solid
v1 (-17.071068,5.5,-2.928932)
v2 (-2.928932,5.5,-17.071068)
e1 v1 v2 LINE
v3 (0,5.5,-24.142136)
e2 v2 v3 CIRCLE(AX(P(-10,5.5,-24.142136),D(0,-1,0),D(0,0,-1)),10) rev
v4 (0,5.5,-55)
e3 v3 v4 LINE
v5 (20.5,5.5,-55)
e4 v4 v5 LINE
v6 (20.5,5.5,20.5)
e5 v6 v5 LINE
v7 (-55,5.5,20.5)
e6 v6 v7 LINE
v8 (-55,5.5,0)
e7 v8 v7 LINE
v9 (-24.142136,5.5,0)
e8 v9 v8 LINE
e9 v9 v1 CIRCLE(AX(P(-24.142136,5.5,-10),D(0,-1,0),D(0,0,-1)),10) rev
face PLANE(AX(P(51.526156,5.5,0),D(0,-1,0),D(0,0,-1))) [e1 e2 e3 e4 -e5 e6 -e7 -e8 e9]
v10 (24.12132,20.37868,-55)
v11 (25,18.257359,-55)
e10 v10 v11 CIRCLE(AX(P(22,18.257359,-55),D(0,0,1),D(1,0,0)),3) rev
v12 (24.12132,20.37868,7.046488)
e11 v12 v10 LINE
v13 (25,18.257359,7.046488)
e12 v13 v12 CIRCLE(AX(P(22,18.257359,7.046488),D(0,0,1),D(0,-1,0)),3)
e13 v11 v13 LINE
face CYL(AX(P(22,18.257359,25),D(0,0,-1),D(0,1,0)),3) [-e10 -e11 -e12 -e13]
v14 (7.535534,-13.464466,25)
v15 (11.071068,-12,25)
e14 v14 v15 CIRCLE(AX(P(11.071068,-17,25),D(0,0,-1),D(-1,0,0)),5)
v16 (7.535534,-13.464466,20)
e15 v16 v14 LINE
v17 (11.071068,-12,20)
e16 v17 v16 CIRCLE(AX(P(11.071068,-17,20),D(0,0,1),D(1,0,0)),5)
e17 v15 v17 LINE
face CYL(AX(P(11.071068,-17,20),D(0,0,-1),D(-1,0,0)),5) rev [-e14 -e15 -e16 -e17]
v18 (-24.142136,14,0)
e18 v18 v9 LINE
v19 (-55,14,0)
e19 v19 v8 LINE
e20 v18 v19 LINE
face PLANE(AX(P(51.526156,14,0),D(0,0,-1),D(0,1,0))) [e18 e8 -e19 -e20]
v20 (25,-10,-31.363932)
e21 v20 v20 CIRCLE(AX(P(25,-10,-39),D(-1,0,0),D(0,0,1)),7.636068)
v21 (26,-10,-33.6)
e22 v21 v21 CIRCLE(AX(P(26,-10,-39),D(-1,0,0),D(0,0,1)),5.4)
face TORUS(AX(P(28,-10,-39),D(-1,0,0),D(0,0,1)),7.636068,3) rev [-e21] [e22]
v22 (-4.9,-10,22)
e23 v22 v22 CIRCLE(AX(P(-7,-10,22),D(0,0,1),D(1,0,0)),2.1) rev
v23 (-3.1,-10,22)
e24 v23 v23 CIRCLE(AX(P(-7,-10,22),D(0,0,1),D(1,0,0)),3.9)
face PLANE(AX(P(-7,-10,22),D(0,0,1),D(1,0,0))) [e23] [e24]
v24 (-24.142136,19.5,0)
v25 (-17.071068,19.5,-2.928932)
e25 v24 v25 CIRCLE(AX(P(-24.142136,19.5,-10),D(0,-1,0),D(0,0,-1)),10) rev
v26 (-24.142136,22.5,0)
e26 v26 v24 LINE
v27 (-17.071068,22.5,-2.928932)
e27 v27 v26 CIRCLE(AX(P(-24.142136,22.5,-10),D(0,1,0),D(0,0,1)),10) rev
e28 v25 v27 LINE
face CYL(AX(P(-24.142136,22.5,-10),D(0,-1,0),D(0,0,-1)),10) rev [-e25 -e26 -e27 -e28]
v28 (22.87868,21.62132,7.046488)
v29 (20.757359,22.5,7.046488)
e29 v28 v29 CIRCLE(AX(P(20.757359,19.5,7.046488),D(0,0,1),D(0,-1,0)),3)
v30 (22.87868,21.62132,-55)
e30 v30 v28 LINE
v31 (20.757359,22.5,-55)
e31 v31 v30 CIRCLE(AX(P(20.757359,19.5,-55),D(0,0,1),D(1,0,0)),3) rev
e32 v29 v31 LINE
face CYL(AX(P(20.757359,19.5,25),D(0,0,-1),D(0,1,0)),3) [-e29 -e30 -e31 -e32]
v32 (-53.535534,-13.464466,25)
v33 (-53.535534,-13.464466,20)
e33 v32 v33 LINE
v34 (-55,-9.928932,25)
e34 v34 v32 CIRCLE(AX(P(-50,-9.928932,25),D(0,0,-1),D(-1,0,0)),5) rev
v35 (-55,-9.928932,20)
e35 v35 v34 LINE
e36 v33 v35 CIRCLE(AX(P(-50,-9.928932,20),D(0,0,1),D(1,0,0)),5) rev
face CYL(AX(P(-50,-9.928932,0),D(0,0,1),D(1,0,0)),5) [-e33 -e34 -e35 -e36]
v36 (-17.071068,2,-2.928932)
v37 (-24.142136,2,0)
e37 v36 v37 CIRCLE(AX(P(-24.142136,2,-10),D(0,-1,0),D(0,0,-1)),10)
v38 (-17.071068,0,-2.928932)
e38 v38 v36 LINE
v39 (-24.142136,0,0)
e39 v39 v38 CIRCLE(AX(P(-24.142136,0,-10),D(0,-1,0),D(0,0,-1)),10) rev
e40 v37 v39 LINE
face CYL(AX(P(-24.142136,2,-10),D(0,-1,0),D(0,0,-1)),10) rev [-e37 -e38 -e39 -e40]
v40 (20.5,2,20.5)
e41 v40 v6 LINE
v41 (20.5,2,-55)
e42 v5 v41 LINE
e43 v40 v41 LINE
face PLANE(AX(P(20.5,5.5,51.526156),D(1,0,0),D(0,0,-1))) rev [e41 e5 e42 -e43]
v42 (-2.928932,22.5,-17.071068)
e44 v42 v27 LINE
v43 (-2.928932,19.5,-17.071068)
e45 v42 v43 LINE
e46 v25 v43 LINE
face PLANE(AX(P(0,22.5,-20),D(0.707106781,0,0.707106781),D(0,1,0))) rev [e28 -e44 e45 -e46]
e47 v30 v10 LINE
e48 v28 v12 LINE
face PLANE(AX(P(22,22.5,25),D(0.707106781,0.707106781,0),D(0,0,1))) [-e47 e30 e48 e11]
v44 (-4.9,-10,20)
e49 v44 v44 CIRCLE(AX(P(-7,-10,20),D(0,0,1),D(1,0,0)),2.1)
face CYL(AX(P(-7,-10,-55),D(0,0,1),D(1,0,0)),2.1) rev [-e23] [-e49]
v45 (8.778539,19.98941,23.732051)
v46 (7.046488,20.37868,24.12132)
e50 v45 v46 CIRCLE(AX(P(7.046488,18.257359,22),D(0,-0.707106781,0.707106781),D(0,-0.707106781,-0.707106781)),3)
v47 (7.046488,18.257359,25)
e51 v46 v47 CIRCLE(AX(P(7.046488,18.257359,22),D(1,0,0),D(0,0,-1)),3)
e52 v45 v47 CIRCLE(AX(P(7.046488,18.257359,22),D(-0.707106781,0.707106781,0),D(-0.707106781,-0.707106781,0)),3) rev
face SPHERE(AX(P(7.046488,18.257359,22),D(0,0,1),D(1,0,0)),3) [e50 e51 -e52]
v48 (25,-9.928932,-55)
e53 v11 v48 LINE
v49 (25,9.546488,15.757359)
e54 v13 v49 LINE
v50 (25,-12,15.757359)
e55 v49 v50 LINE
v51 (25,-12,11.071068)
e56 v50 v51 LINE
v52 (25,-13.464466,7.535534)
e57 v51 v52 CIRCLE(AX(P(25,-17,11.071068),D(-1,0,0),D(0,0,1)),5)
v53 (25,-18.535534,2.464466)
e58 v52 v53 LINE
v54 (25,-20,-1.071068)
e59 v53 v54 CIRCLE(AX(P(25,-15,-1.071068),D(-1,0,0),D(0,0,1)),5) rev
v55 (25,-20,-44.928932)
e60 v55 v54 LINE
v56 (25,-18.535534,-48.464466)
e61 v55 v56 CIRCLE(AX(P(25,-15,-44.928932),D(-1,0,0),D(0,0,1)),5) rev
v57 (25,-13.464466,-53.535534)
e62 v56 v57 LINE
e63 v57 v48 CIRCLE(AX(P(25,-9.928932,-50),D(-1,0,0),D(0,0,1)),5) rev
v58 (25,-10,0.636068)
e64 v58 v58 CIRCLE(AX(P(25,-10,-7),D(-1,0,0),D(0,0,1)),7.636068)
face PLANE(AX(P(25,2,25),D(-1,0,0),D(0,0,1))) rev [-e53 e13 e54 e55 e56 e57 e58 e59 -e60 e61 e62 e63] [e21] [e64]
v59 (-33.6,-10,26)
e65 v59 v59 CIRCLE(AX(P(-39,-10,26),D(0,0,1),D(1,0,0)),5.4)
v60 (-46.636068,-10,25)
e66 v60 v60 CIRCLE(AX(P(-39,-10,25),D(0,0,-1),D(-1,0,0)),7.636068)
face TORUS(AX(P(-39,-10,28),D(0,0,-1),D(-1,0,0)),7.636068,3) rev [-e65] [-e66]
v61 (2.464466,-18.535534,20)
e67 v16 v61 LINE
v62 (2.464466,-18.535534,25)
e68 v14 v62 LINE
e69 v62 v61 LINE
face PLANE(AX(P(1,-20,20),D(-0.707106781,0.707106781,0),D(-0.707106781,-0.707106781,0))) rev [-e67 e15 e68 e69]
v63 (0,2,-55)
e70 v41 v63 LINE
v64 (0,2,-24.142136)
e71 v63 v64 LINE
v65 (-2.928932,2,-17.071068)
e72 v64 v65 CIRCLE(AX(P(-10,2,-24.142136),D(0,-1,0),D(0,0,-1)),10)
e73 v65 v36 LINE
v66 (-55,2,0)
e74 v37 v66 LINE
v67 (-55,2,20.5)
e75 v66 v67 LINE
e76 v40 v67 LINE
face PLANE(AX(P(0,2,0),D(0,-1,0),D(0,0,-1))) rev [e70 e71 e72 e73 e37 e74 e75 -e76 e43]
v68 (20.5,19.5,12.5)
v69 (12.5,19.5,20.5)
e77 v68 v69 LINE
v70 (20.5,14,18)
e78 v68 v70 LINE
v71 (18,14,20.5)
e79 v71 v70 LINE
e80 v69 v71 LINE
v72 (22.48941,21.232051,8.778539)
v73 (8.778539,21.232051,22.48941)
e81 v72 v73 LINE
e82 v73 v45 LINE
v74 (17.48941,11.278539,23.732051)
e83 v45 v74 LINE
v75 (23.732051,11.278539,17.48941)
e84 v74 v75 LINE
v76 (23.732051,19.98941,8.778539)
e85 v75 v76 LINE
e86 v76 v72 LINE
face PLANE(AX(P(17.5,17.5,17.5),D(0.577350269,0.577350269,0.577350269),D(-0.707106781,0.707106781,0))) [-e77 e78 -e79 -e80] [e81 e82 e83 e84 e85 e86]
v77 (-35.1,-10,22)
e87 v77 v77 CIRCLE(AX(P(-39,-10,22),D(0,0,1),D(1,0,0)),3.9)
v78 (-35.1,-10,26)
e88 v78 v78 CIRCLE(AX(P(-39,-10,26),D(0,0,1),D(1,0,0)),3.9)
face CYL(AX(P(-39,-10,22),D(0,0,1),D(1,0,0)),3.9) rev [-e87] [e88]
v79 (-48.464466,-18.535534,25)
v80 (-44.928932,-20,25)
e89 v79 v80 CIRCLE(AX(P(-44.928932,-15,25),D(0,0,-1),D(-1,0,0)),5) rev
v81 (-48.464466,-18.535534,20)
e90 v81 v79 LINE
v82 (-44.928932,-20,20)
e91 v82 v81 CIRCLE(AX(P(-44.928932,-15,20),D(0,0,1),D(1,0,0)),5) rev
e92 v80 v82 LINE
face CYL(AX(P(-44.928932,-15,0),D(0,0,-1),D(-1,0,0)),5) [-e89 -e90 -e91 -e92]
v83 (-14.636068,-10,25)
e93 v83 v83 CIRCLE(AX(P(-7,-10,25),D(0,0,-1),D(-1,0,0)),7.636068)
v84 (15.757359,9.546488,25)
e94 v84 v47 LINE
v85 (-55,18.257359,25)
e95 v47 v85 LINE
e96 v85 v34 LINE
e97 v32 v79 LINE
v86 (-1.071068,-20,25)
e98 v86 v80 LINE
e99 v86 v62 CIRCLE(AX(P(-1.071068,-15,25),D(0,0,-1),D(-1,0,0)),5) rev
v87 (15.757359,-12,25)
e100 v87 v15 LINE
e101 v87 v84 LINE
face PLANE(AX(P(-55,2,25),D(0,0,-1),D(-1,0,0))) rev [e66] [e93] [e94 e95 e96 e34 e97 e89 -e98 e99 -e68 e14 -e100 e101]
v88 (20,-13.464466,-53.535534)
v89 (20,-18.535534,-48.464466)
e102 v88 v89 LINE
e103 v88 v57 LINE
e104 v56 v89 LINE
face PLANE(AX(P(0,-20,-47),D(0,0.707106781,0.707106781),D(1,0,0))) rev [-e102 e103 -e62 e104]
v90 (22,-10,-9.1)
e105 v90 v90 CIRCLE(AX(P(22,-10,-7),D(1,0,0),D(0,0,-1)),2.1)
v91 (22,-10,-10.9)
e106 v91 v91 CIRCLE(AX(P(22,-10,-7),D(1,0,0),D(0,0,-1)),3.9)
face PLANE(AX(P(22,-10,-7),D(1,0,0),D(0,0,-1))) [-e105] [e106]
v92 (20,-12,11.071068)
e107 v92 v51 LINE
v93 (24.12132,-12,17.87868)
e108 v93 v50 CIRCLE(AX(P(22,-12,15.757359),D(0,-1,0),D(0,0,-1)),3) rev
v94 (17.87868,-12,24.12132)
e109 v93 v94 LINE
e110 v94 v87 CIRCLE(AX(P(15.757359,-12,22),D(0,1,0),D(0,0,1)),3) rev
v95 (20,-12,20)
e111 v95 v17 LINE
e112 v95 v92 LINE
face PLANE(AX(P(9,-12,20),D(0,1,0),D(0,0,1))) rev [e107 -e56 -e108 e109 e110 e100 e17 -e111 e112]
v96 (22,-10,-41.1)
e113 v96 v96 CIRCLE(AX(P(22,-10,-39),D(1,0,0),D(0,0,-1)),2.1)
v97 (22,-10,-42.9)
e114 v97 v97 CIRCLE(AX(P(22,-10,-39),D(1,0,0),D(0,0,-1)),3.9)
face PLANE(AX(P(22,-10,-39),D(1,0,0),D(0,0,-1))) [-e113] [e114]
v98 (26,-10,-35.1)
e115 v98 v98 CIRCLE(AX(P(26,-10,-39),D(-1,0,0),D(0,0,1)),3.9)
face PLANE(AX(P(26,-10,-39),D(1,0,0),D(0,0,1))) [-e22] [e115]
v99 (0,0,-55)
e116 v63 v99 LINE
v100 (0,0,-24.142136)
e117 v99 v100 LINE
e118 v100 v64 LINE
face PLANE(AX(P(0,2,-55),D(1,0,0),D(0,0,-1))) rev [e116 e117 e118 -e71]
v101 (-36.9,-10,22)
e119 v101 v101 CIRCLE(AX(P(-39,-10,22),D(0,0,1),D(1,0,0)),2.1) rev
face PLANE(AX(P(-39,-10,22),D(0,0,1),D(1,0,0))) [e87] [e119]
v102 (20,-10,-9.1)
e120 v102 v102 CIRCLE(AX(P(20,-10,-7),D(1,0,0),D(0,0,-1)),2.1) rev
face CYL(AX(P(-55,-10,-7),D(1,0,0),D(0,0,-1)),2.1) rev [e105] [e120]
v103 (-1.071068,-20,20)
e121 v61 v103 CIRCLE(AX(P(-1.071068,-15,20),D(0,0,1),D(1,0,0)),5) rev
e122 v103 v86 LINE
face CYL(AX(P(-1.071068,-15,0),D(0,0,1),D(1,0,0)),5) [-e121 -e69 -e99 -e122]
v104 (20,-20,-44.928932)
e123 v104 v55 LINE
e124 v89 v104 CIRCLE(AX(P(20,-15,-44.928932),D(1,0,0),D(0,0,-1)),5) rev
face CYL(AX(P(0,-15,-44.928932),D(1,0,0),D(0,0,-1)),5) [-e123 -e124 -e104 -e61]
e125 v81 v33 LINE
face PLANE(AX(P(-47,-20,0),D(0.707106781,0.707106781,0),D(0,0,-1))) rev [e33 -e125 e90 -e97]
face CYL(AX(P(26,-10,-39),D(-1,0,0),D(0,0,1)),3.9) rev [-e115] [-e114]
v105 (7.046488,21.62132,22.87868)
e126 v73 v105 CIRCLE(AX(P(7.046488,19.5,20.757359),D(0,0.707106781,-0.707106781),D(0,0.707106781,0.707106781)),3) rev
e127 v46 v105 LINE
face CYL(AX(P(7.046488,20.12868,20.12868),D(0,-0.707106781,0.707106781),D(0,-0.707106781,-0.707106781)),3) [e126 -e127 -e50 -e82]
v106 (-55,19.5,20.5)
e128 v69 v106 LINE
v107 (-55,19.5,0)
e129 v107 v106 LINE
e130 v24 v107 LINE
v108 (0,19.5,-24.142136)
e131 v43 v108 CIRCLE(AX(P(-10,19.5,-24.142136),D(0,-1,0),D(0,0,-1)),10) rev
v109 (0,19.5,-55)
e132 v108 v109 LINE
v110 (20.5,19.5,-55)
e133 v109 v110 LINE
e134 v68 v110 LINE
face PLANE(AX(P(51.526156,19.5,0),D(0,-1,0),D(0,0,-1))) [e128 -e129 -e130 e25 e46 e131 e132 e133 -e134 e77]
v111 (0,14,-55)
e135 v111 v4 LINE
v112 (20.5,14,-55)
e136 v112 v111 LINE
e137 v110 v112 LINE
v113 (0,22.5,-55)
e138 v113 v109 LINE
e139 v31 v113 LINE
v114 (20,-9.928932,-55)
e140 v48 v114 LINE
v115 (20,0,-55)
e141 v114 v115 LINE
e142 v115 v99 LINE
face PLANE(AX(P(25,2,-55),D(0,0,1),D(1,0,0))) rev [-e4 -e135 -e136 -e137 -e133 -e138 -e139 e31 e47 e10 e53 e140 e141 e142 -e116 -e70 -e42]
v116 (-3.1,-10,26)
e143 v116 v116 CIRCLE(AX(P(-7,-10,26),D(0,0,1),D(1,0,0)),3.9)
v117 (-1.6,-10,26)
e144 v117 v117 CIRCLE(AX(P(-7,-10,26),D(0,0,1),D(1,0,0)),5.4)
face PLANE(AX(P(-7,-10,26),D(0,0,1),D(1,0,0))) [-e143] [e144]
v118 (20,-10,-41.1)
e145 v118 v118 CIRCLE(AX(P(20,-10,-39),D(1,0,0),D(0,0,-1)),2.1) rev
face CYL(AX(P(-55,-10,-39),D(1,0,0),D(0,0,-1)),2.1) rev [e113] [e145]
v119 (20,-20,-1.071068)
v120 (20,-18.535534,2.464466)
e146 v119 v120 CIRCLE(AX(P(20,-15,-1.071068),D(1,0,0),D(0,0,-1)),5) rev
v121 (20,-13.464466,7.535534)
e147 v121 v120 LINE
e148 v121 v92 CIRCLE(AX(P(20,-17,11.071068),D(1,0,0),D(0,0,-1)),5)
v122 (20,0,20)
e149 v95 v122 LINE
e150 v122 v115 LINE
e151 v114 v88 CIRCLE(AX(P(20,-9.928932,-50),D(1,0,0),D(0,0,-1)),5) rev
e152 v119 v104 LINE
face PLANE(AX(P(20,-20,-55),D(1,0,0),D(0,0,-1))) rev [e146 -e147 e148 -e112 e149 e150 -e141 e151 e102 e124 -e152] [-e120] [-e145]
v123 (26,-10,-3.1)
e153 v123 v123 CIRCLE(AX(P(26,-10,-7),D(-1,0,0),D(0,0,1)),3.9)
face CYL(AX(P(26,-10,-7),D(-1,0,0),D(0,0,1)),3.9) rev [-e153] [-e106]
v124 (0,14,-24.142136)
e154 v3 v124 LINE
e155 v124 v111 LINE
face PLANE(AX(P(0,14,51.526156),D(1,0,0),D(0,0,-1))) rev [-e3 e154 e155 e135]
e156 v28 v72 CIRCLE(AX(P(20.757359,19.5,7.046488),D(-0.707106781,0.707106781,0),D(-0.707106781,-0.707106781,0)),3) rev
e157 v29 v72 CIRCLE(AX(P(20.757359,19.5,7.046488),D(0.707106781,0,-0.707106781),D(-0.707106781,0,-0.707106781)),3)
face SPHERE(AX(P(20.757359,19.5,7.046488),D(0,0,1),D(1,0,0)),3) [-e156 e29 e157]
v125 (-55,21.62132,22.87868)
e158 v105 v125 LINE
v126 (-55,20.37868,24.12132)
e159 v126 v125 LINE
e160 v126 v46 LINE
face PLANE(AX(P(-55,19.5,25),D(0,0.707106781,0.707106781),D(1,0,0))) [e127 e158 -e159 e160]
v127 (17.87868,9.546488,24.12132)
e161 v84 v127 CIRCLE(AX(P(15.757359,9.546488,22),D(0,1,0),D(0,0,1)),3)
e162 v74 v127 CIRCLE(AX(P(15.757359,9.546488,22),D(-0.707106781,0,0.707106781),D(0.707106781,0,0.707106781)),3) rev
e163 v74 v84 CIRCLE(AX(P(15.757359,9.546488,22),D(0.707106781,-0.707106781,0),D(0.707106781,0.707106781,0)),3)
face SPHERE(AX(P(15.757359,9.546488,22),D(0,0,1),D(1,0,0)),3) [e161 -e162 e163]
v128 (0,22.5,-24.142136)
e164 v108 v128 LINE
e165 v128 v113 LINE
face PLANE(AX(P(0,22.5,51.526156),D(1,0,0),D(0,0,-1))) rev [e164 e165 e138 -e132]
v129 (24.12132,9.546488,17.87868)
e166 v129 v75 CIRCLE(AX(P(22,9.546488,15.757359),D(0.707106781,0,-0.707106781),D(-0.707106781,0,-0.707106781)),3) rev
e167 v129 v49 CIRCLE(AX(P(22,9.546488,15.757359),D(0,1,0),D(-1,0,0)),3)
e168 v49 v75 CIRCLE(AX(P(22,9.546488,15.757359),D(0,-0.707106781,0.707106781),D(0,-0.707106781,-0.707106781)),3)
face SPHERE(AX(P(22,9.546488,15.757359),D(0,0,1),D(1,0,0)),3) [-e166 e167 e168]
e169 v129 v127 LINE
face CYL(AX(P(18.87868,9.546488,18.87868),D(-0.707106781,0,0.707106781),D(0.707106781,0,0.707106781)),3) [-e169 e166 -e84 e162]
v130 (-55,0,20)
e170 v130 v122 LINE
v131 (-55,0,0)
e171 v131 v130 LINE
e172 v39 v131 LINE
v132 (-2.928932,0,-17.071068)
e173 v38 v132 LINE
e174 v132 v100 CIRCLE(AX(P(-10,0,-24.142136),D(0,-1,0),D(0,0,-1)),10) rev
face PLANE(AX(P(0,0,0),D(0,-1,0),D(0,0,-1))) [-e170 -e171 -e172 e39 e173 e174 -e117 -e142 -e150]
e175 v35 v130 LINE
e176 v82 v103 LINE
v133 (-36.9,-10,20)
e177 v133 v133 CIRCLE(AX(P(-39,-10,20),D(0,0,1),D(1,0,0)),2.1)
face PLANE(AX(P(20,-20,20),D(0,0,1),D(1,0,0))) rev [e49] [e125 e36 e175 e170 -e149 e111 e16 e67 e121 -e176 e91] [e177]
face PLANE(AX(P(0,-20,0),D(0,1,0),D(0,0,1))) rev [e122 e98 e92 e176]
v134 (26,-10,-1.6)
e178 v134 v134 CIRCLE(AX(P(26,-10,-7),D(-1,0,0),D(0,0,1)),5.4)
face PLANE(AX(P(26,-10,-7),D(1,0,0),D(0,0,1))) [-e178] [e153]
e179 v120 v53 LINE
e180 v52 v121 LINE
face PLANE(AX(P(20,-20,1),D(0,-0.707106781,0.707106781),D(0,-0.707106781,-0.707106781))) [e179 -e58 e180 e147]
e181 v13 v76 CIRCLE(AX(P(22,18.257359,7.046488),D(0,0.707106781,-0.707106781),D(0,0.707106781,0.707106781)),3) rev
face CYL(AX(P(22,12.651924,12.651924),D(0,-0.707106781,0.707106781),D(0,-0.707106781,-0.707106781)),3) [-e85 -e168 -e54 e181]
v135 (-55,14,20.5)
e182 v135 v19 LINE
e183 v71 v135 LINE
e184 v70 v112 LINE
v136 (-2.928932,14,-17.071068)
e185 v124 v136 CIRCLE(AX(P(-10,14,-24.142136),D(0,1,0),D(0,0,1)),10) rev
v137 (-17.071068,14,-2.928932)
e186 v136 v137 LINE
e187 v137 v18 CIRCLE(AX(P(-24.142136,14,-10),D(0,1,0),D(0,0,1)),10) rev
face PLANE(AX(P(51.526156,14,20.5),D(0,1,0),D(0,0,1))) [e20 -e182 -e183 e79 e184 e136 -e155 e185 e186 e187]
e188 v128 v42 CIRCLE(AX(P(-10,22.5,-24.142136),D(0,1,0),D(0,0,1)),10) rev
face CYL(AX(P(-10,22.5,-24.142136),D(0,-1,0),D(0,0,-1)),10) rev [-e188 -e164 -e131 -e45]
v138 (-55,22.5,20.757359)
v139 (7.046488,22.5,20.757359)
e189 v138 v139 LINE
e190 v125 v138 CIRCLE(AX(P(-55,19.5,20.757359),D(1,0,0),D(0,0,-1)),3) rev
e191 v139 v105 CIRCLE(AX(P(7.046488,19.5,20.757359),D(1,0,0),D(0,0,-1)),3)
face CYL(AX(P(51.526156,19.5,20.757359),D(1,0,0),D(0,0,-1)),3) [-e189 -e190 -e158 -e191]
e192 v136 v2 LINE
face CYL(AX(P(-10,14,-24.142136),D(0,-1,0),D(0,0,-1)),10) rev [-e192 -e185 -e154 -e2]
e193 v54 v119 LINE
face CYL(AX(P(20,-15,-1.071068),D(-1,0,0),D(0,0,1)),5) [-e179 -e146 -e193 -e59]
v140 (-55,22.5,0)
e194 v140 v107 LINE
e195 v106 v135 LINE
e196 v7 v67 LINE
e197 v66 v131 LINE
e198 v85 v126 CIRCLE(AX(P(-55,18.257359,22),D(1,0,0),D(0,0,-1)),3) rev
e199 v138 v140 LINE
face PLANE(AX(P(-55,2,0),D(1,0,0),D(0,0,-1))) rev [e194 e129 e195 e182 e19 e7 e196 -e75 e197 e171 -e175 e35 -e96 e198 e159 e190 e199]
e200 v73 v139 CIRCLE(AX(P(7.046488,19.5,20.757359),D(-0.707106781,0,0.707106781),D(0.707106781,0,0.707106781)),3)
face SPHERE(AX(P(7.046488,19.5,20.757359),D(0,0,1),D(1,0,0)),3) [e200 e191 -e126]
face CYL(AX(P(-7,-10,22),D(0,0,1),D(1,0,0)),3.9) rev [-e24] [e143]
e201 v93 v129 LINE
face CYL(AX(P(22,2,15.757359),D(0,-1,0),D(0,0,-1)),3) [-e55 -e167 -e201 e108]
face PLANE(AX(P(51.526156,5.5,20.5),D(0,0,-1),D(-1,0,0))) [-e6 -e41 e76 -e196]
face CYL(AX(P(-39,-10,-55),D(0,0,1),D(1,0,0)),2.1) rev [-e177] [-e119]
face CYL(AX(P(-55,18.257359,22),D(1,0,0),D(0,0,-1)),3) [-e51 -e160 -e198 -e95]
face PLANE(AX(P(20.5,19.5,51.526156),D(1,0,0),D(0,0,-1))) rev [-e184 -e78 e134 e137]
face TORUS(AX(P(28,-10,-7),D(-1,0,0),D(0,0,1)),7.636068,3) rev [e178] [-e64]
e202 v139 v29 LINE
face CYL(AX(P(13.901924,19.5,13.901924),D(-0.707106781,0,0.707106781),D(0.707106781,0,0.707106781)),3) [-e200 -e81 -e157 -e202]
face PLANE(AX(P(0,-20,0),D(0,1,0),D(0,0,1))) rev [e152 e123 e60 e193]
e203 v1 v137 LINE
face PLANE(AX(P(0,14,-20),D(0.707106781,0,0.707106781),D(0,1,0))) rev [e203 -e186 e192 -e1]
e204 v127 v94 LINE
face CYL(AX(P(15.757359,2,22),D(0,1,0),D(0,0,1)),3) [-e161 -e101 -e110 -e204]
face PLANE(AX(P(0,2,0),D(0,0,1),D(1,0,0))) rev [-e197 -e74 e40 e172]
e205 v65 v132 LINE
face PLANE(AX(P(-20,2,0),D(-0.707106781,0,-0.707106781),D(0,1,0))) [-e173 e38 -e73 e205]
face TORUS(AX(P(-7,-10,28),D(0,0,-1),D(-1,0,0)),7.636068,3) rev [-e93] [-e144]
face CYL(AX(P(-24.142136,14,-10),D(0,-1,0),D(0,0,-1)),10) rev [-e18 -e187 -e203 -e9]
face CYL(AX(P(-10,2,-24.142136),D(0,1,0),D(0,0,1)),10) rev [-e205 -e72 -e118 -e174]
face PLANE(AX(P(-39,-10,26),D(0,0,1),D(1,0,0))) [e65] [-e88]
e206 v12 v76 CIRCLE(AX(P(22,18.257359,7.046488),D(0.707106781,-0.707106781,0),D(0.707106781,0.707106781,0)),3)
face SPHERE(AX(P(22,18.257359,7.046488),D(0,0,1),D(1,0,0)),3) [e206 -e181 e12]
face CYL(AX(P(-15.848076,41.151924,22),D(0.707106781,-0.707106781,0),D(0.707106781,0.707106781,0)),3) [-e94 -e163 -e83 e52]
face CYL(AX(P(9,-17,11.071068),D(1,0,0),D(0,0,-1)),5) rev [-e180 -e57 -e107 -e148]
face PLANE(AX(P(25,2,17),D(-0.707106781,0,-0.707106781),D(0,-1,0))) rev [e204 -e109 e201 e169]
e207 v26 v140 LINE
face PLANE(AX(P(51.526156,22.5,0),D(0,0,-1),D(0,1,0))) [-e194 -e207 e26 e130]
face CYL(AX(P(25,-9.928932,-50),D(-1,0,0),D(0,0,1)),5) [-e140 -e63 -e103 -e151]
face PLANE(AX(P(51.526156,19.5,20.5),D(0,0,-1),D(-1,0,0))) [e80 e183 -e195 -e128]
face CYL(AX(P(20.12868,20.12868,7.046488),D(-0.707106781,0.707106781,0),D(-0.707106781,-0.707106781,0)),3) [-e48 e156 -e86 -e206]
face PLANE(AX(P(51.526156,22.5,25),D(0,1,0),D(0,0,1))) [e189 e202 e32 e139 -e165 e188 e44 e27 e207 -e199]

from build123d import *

# Parameters (mm, degrees)
BOSS_EXTRUDE1_DEPTH = 2
BOSS_EXTRUDE2_DEPTH = 20
BOSS_EXTRUDE3_REACH = 101.121
CHAMFER1_SIZE       = 20
FILLET1_R           = 10
SKETCH5_R           = 2.1
CUT_EXTRUDE1_DEPTH  = 100.65565714
SKETCH6_R           = 3.9
CUT_EXTRUDE2_DEPTH  = 3
BOSS_EXTRUDE4_START = 1
SKETCH7_R           = 5.4
SKETCH7_R_2         = 3.9
BOSS_EXTRUDE4_DEPTH = 1
CHAMFER4_SIZE       = 3
CHAMFER6_SIZE       = 8
FILLET4_R           = 3
CHAMFER5_SIZE       = 8
CUT_EXTRUDE3_DEPTH  = 5
FILLET5_R           = 5
SKETCH11_R          = 3.9
CUT_EXTRUDE4_DEPTH  = 3


with BuildPart() as part:
    # Sketch1 → Boss-Extrude1 (new body)
    with BuildSketch(Plane(origin=(0, 0, 0), x_dir=(1, 0, 0), z_dir=(0, 1, 0))):
        Polygon((0, 0), (-55, 0), (-55, -25), (25, -25), (25, 55), (0, 55), align=None)
    extrude(amount=BOSS_EXTRUDE1_DEPTH)

    # Sketch2 → Boss-Extrude2 (add)
    with BuildSketch(Plane.XZ):
        Polygon((-55, 25), (25, 25), (25, -55), (20, -55), (20, 20), (-55, 20), align=None)
    extrude(amount=BOSS_EXTRUDE2_DEPTH)

    # Boss-Extrude3: up to this plane
    boss_extrude3_end = Plane(origin=(0, 0, 0), z_dir=(-0.7071067811865482, 0, 0.7071067811865468))
    # Sketch4 → Boss-Extrude3 (add, up to the surface)
    with BuildSketch(Plane.ZY.offset(55), mode=Mode.PRIVATE) as boss_extrude3_sk1:
        Polygon((25, 2), (25, 22.5), (0, 22.5), (0, 19.5), (20.5, 19.5), (20.5, 14), (0, 14), (0, 5.5), (20.5, 5.5), (20.5, 2), align=None)
    boss_extrude3_tool1 = split(extrude(boss_extrude3_sk1.sketch, amount=-BOSS_EXTRUDE3_REACH, mode=Mode.PRIVATE), bisect_by=boss_extrude3_end, keep=Keep.BOTH, mode=Mode.PRIVATE)
    boss_extrude3 = boss_extrude3_tool1.solids().sort_by_distance((-55, 12.5625, 13.765625))[0]
    add(boss_extrude3)

    # Mirror1: Boss-Extrude3 across plane
    add(boss_extrude3.mirror(Plane(origin=(0, 0, 0), x_dir=(0.7071067811865467, 0, 0.7071067811865482), z_dir=(-0.7071067811865482, 0, 0.7071067811865468))))

    # Chamfer1
    chamfer1_edges = [part.edges().sort_by_distance(p)[0] for p in [
        (0, 1, 0),
        (0, 9.75, 0),
        (0, 21, 0),
    ]]
    chamfer(chamfer1_edges, length=CHAMFER1_SIZE)

    # Fillet1
    fillet1_edges = [part.edges().sort_by_distance(p)[0] for p in [
        (-20, 1, 0),
        (0, 1, -20),
        (0, 9.75, -20),
        (-20, 9.75, 0),
        (0, 21, -20),
        (-20, 21, 0),
    ]]
    fillet(fillet1_edges, radius=FILLET1_R)

    # Sketch5 → Cut-Extrude1 (cut, through all)
    with BuildSketch(Plane.XY.offset(25)):
        with Locations((-39, -10)):
            Circle(SKETCH5_R)
        with Locations((-7, -10)):
            Circle(SKETCH5_R)
    cut_extrude1 = extrude(amount=-CUT_EXTRUDE1_DEPTH, mode=Mode.SUBTRACT)

    # Mirror2: Cut-Extrude1 across plane
    add(cut_extrude1.mirror(Plane(origin=(0, 0, 0), x_dir=(0.7071067811865467, 0, 0.7071067811865482), z_dir=(-0.7071067811865482, 0, 0.7071067811865468))), mode=Mode.SUBTRACT)

    # Sketch6 → Cut-Extrude2 (cut)
    with BuildSketch(Plane.XY.offset(25)):
        with Locations((-39, -10)):
            Circle(SKETCH6_R)
        with Locations((-7, -10)):
            Circle(SKETCH6_R)
    extrude(amount=-CUT_EXTRUDE2_DEPTH, mode=Mode.SUBTRACT)

    # Sketch7 → Boss-Extrude4 (add)
    # profile 1 of 2: a face of its own
    with BuildSketch(Plane.XY.offset(25).offset(BOSS_EXTRUDE4_START)):
        with Locations(Location((-39, -10, 0), (0, 0, 180))):
            Circle(SKETCH7_R)
        with Locations((-39, -10)):
            Circle(SKETCH7_R_2, mode=Mode.SUBTRACT)
    # profile 2 of 2: a face of its own
    with BuildSketch(Plane.XY.offset(25).offset(BOSS_EXTRUDE4_START)):
        with Locations(Location((-7, -10, 0), (0, 0, 180))):
            Circle(SKETCH7_R)
        with Locations((-7, -10)):
            Circle(SKETCH7_R_2, mode=Mode.SUBTRACT)
    boss_extrude4 = extrude(amount=-BOSS_EXTRUDE4_DEPTH)

    # Mirror4: Boss-Extrude4 across plane
    add(boss_extrude4.mirror(Plane(origin=(0, 0, 0), x_dir=(0.7071067811865467, 0, 0.7071067811865482), z_dir=(-0.7071067811865482, 0, 0.7071067811865468))))

    # Sketch8 → Cut-Loft1 section 0
    with BuildSketch(Plane(origin=(0, 22.5, 0), x_dir=(1, 0, 0), z_dir=(0, 1, 0)), mode=Mode.PRIVATE) as cut_loft1_s0:
        with BuildLine():
            Line((5, -25), (25, -5))
            Line((25, -5), (25, -25))
            Line((25, -25), (5, -25))
        make_face()
    loft([Vertex(25, 2.5, 25), cut_loft1_s0.sketch], mode=Mode.SUBTRACT)

    # Chamfer4
    chamfer4_edges = [part.edges().sort_by_distance(p)[0] for p in [
        (25, 22.5, -25),
        (-25, 22.5, 25),
    ]]
    chamfer(chamfer4_edges, length=CHAMFER4_SIZE)

    # Chamfer6
    chamfer6_edges = [part.edges().sort_by_distance(p)[0] for p in [
        (25, -8.75, 25),
    ]]
    chamfer(chamfer6_edges, length=CHAMFER6_SIZE)

    # Fillet4
    # the kernel refuses this fillet: 3 mm, written as the material it adds along each edge
    with BuildSketch(Plane(origin=(-39, -10, 25), x_dir=(-1, 0, 0), z_dir=(0, 1, 0))) as fillet4_piece_1:
        with BuildLine():
            CenterArc((7.636067977, 3), FILLET4_R, 221.810314896, 48.189685104)
            Line((5.4, 1), (5.4, 0))
            Line((5.4, 0), (7.636067977, 0))
        make_face()
    revolve(axis=Axis((-39, -10, 25), (0, 0, 1)))
    with BuildSketch(Plane(origin=(-7, -10, 25), x_dir=(-1, 0, 0), z_dir=(0, 1, 0))) as fillet4_piece_2:
        with BuildLine():
            CenterArc((7.636067977, 3), FILLET4_R, 221.810314896, 48.189685104)
            Line((5.4, 1), (5.4, 0))
            Line((5.4, 0), (7.636067977, 0))
        make_face()
    revolve(axis=Axis((-7, -10, 25), (0, 0, 1)))
    with BuildSketch(Plane(origin=(25, -10, -39), x_dir=(0, 0, -1), z_dir=(0, 1, 0))) as fillet4_piece_3:
        with BuildLine():
            CenterArc((7.636067977, -3), FILLET4_R, 90, 48.189685104)
            Line((5.4, -1), (5.4, 0))
            Line((5.4, 0), (7.636067977, 0))
        make_face()
    revolve(axis=Axis((25, -10, -39), (-1, 0, 0)))
    with BuildSketch(Plane(origin=(25, -10, -7), x_dir=(0, 0, -1), z_dir=(0, 1, 0))) as fillet4_piece_4:
        with BuildLine():
            CenterArc((7.636067977, -3), FILLET4_R, 90, 48.189685104)
            Line((5.4, -1), (5.4, 0))
            Line((5.4, 0), (7.636067977, 0))
        make_face()
    revolve(axis=Axis((25, -10, -7), (-1, 0, 0)))
    # the kernel refuses this fillet: 3 mm, written as the material it takes off along each edge
    with BuildSketch(Plane(origin=(7.046488264, 19.5, 20.757359313), x_dir=(0.4759631494779672, 0.3365567705907776, -0.8125199200687456), z_dir=(0.21513724867401396, 0.8512541359367823, 0.47862549063280946))) as fillet4_2_piece_1_section:
        Polygon((-4.142356801, -4.142356801), (4.142356801, -4.142356801), (4.142356801, 4.142356801), (-4.142356801, 4.142356801), align=None)
    fillet4_2_piece_1 = extrude(amount=4.142356801, mode=Mode.PRIVATE)
    fillet4_2_piece_1 = split(fillet4_2_piece_1, bisect_by=Plane(origin=(7.046488264, 19.5, 20.757359313), z_dir=(-0.7071067811865475, 0, 0.7071067811865476)), keep=Keep.TOP, mode=Mode.PRIVATE)
    fillet4_2_piece_1 = split(fillet4_2_piece_1, bisect_by=Plane(origin=(7.046488264, 19.5, 20.757359313), z_dir=(1, 0, 0)), keep=Keep.TOP, mode=Mode.PRIVATE)
    fillet4_2_piece_1 = split(fillet4_2_piece_1, bisect_by=Plane(origin=(7.046488264, 19.5, 20.757359313), z_dir=(-1.6345182834260301e-15, 0.7071067811865476, -0.7071067811865476)), keep=Keep.TOP, mode=Mode.PRIVATE)
    fillet4_2_piece_1 = split(fillet4_2_piece_1, bisect_by=Plane(origin=(8.813180088, 21.266691824, 22.524051137), z_dir=(-0.5773502691896255, -0.5773502691896266, -0.5773502691896253)), keep=Keep.TOP, mode=Mode.PRIVATE)
    fillet4_2_piece_1 = split(fillet4_2_piece_1, bisect_by=Plane(origin=(7.046488264, 22.56, 20.757359313), z_dir=(0, -1, 0)), keep=Keep.TOP, mode=Mode.PRIVATE)
    fillet4_2_piece_1 = split(fillet4_2_piece_1, bisect_by=Plane(origin=(7.046488264, 21.66374675, 22.921106063), z_dir=(0, -0.7071067811865476, -0.7071067811865476)), keep=Keep.TOP, mode=Mode.PRIVATE)
    fillet4_2_piece_1 = fillet4_2_piece_1 - Plane(origin=(7.046488264, 19.5, 20.757359313), x_dir=(-0.21513724867401396, -0.8512541359367823, -0.47862549063280946), z_dir=(0.4759631494779672, 0.3365567705907776, -0.8125199200687456)) * Sphere(FILLET4_R, mode=Mode.PRIVATE)
    add(fillet4_2_piece_1, mode=Mode.SUBTRACT)
    with BuildSketch(Plane(origin=(20.757359313, 19.5, 7.046488264), x_dir=(0.8125199200687456, -0.3365567705907777, -0.4759631494779674), z_dir=(0.47862549063280957, 0.8512541359367822, 0.2151372486740138))) as fillet4_2_piece_2_section:
        Polygon((-4.142356801, -4.142356801), (4.142356801, -4.142356801), (4.142356801, 4.142356801), (-4.142356801, 4.142356801), align=None)
    fillet4_2_piece_2 = extrude(amount=4.142356801, mode=Mode.PRIVATE)
    fillet4_2_piece_2 = split(fillet4_2_piece_2, bisect_by=Plane(origin=(20.757359313, 19.5, 7.046488264), z_dir=(0.7071067811865475, 0, -0.7071067811865476)), keep=Keep.TOP, mode=Mode.PRIVATE)
    fillet4_2_piece_2 = split(fillet4_2_piece_2, bisect_by=Plane(origin=(20.757359313, 19.5, 7.046488264), z_dir=(0, 0, 1)), keep=Keep.TOP, mode=Mode.PRIVATE)
    fillet4_2_piece_2 = split(fillet4_2_piece_2, bisect_by=Plane(origin=(20.757359313, 19.5, 7.046488264), z_dir=(-0.7071067811865476, 0.7071067811865476, -1.346073880468496e-15)), keep=Keep.TOP, mode=Mode.PRIVATE)
    fillet4_2_piece_2 = split(fillet4_2_piece_2, bisect_by=Plane(origin=(22.524051137, 21.266691824, 8.813180088), z_dir=(-0.5773502691896255, -0.5773502691896266, -0.5773502691896253)), keep=Keep.TOP, mode=Mode.PRIVATE)
    fillet4_2_piece_2 = split(fillet4_2_piece_2, bisect_by=Plane(origin=(20.757359313, 22.56, 7.046488264), z_dir=(0, -1, 0)), keep=Keep.TOP, mode=Mode.PRIVATE)
    fillet4_2_piece_2 = split(fillet4_2_piece_2, bisect_by=Plane(origin=(22.921106063, 21.66374675, 7.046488264), z_dir=(-0.7071067811865476, -0.7071067811865476, 0)), keep=Keep.TOP, mode=Mode.PRIVATE)
    fillet4_2_piece_2 = fillet4_2_piece_2 - Plane(origin=(20.757359313, 19.5, 7.046488264), x_dir=(-0.47862549063280957, -0.8512541359367822, -0.2151372486740138), z_dir=(0.8125199200687456, -0.3365567705907777, -0.4759631494779674)) * Sphere(FILLET4_R, mode=Mode.PRIVATE)
    add(fillet4_2_piece_2, mode=Mode.SUBTRACT)
    with BuildSketch(Plane(origin=(22, 18.257359313, 7.046488264), x_dir=(0, 0.40997761055293136, -0.9120955864630136), z_dir=(0.851254135936782, 0.47862549063280996, 0.21513724867401388))) as fillet4_2_piece_3_section:
        Polygon((-4.142356801, -4.142356801), (4.142356801, -4.142356801), (4.142356801, 4.142356801), (-4.142356801, 4.142356801), align=None)
    fillet4_2_piece_3 = extrude(amount=4.142356801, mode=Mode.PRIVATE)
    fillet4_2_piece_3 = split(fillet4_2_piece_3, bisect_by=Plane(origin=(22, 18.257359313, 7.046488264), z_dir=(0, 0, 1)), keep=Keep.TOP, mode=Mode.PRIVATE)
    fillet4_2_piece_3 = split(fillet4_2_piece_3, bisect_by=Plane(origin=(22, 18.257359313, 7.046488264), z_dir=(0.7071067811865476, -0.7071067811865476, 1.346073880468496e-15)), keep=Keep.TOP, mode=Mode.PRIVATE)
    fillet4_2_piece_3 = split(fillet4_2_piece_3, bisect_by=Plane(origin=(22, 18.257359313, 7.046488264), z_dir=(0, 0.7071067811865468, -0.7071067811865483)), keep=Keep.TOP, mode=Mode.PRIVATE)
    fillet4_2_piece_3 = split(fillet4_2_piece_3, bisect_by=Plane(origin=(25.06, 18.257359313, 7.046488264), z_dir=(-1, 0, 0)), keep=Keep.TOP, mode=Mode.PRIVATE)
    fillet4_2_piece_3 = split(fillet4_2_piece_3, bisect_by=Plane(origin=(24.16374675, 20.421106063, 7.046488264), z_dir=(-0.7071067811865476, -0.7071067811865476, 0)), keep=Keep.TOP, mode=Mode.PRIVATE)
    fillet4_2_piece_3 = split(fillet4_2_piece_3, bisect_by=Plane(origin=(23.766691824, 20.024051137, 8.813180088), z_dir=(-0.5773502691896255, -0.5773502691896266, -0.5773502691896253)), keep=Keep.TOP, mode=Mode.PRIVATE)
    fillet4_2_piece_3 = fillet4_2_piece_3 - Plane(origin=(22, 18.257359313, 7.046488264), x_dir=(-0.851254135936782, -0.47862549063280996, -0.21513724867401388), z_dir=(0, 0.40997761055293136, -0.9120955864630136)) * Sphere(FILLET4_R, mode=Mode.PRIVATE)
    add(fillet4_2_piece_3, mode=Mode.SUBTRACT)
    with BuildSketch(Plane(origin=(7.046488264, 18.257359313, 22), x_dir=(0.9120955864630136, -0.4099776105529315, 0), z_dir=(0.215137248674014, 0.47862549063281007, 0.851254135936782))) as fillet4_2_piece_4_section:
        Polygon((-4.142356801, -4.142356801), (4.142356801, -4.142356801), (4.142356801, 4.142356801), (-4.142356801, 4.142356801), align=None)
    fillet4_2_piece_4 = extrude(amount=4.142356801, mode=Mode.PRIVATE)
    fillet4_2_piece_4 = split(fillet4_2_piece_4, bisect_by=Plane(origin=(7.046488264, 18.257359313, 22), z_dir=(-0.7071067811865482, 0.7071067811865468, 0)), keep=Keep.TOP, mode=Mode.PRIVATE)
    fillet4_2_piece_4 = split(fillet4_2_piece_4, bisect_by=Plane(origin=(7.046488264, 18.257359313, 22), z_dir=(1.6345182834260301e-15, -0.7071067811865476, 0.7071067811865476)), keep=Keep.TOP, mode=Mode.PRIVATE)
    fillet4_2_piece_4 = split(fillet4_2_piece_4, bisect_by=Plane(origin=(7.046488264, 18.257359313, 22), z_dir=(1, 0, 0)), keep=Keep.TOP, mode=Mode.PRIVATE)
    fillet4_2_piece_4 = split(fillet4_2_piece_4, bisect_by=Plane(origin=(7.046488264, 18.257359313, 25.06), z_dir=(0, 0, -1)), keep=Keep.TOP, mode=Mode.PRIVATE)
    fillet4_2_piece_4 = split(fillet4_2_piece_4, bisect_by=Plane(origin=(8.813180088, 20.024051137, 23.766691824), z_dir=(-0.5773502691896255, -0.5773502691896266, -0.5773502691896253)), keep=Keep.TOP, mode=Mode.PRIVATE)
    fillet4_2_piece_4 = split(fillet4_2_piece_4, bisect_by=Plane(origin=(7.046488264, 20.421106063, 24.16374675), z_dir=(0, -0.7071067811865476, -0.7071067811865476)), keep=Keep.TOP, mode=Mode.PRIVATE)
    fillet4_2_piece_4 = fillet4_2_piece_4 - Plane(origin=(7.046488264, 18.257359313, 22), x_dir=(-0.215137248674014, -0.47862549063281007, -0.851254135936782), z_dir=(0.9120955864630136, -0.4099776105529315, 0)) * Sphere(FILLET4_R, mode=Mode.PRIVATE)
    add(fillet4_2_piece_4, mode=Mode.SUBTRACT)
    with BuildSketch(Plane(origin=(22, 9.546488264, 15.757359313), x_dir=(0, 0.9120955864630131, -0.4099776105529326), z_dir=(0.8512541359367822, 0.2151372486740144, 0.47862549063280957))) as fillet4_2_piece_5_section:
        Polygon((-4.142356801, -4.142356801), (4.142356801, -4.142356801), (4.142356801, 4.142356801), (-4.142356801, 4.142356801), align=None)
    fillet4_2_piece_5 = extrude(amount=4.142356801, mode=Mode.PRIVATE)
    fillet4_2_piece_5 = split(fillet4_2_piece_5, bisect_by=Plane(origin=(22, 9.546488264, 15.757359313), z_dir=(0, -0.7071067811865468, 0.7071067811865483)), keep=Keep.TOP, mode=Mode.PRIVATE)
    fillet4_2_piece_5 = split(fillet4_2_piece_5, bisect_by=Plane(origin=(22, 9.546488264, 15.757359313), z_dir=(0.7071067811865476, 0, -0.7071067811865476)), keep=Keep.TOP, mode=Mode.PRIVATE)
    fillet4_2_piece_5 = split(fillet4_2_piece_5, bisect_by=Plane(origin=(22, 9.546488264, 15.757359313), z_dir=(0, 1, 0)), keep=Keep.TOP, mode=Mode.PRIVATE)
    fillet4_2_piece_5 = split(fillet4_2_piece_5, bisect_by=Plane(origin=(25.06, 9.546488264, 15.757359313), z_dir=(-1, 0, 0)), keep=Keep.TOP, mode=Mode.PRIVATE)
    fillet4_2_piece_5 = split(fillet4_2_piece_5, bisect_by=Plane(origin=(23.766691824, 11.313180088, 17.524051137), z_dir=(-0.5773502691896255, -0.5773502691896266, -0.5773502691896253)), keep=Keep.TOP, mode=Mode.PRIVATE)
    fillet4_2_piece_5 = split(fillet4_2_piece_5, bisect_by=Plane(origin=(24.16374675, 9.546488264, 17.921106063), z_dir=(-0.7071067811865476, 0, -0.7071067811865476)), keep=Keep.TOP, mode=Mode.PRIVATE)
    fillet4_2_piece_5 = fillet4_2_piece_5 - Plane(origin=(22, 9.546488264, 15.757359313), x_dir=(-0.8512541359367822, -0.2151372486740144, -0.47862549063280957), z_dir=(0, 0.9120955864630131, -0.4099776105529326)) * Sphere(FILLET4_R, mode=Mode.PRIVATE)
    add(fillet4_2_piece_5, mode=Mode.SUBTRACT)
    with BuildSketch(Plane(origin=(15.757359313, 9.546488264, 22), x_dir=(0.4099776105529324, -0.9120955864630131, 0), z_dir=(0.47862549063280974, 0.2151372486740144, 0.851254135936782))) as fillet4_2_piece_6_section:
        Polygon((-4.142356801, -4.142356801), (4.142356801, -4.142356801), (4.142356801, 4.142356801), (-4.142356801, 4.142356801), align=None)
    fillet4_2_piece_6 = extrude(amount=4.142356801, mode=Mode.PRIVATE)
    fillet4_2_piece_6 = split(fillet4_2_piece_6, bisect_by=Plane(origin=(15.757359313, 9.546488264, 22), z_dir=(0.7071067811865482, -0.7071067811865468, 0)), keep=Keep.TOP, mode=Mode.PRIVATE)
    fillet4_2_piece_6 = split(fillet4_2_piece_6, bisect_by=Plane(origin=(15.757359313, 9.546488264, 22), z_dir=(-0.7071067811865476, 0, 0.7071067811865476)), keep=Keep.TOP, mode=Mode.PRIVATE)
    fillet4_2_piece_6 = split(fillet4_2_piece_6, bisect_by=Plane(origin=(15.757359313, 9.546488264, 22), z_dir=(0, 1, 0)), keep=Keep.TOP, mode=Mode.PRIVATE)
    fillet4_2_piece_6 = split(fillet4_2_piece_6, bisect_by=Plane(origin=(15.757359313, 9.546488264, 25.06), z_dir=(0, 0, -1)), keep=Keep.TOP, mode=Mode.PRIVATE)
    fillet4_2_piece_6 = split(fillet4_2_piece_6, bisect_by=Plane(origin=(17.524051137, 11.313180088, 23.766691824), z_dir=(-0.5773502691896255, -0.5773502691896266, -0.5773502691896253)), keep=Keep.TOP, mode=Mode.PRIVATE)
    fillet4_2_piece_6 = split(fillet4_2_piece_6, bisect_by=Plane(origin=(17.921106063, 9.546488264, 24.16374675), z_dir=(-0.7071067811865476, 0, -0.7071067811865476)), keep=Keep.TOP, mode=Mode.PRIVATE)
    fillet4_2_piece_6 = fillet4_2_piece_6 - Plane(origin=(15.757359313, 9.546488264, 22), x_dir=(-0.47862549063280974, -0.2151372486740144, -0.851254135936782), z_dir=(0.4099776105529324, -0.9120955864630131, 0)) * Sphere(FILLET4_R, mode=Mode.PRIVATE)
    add(fillet4_2_piece_6, mode=Mode.SUBTRACT)
    with BuildSketch(Plane(origin=(8.144564476, 22.5, 21.855435524), x_dir=(0.40824829046386324, -0.8164965809277257, 0.4082482904638636), z_dir=(0.7071067811865476, 0, -0.7071067811865475))) as fillet4_2_piece_7:
        with BuildLine():
            CenterArc((FILLET4_R * 0.517638090205, FILLET4_R), FILLET4_R, 215.264389683, 54.735610317)
            Line((-FILLET4_R * 0.298858490723, FILLET4_R * 0.42264973081), (0, 0))
            Line((0, 0), (FILLET4_R * 0.517638090205, 0))
        make_face()
    extrude(amount=19.390099789, mode=Mode.SUBTRACT)
    with BuildSketch(Plane(origin=(-58.106601718, 22.5, 22), x_dir=(0, -0.7071067811865475, 0.7071067811865475), z_dir=(1, 0, 0)), Plane(origin=(-58.106601718, 19.5, 25), x_dir=(0, -1, 0), z_dir=(1, 0, 0))) as fillet4_2_piece_8:
        with BuildLine():
            CenterArc((FILLET4_R * 0.414213562373, FILLET4_R), FILLET4_R, 225, 45)
            Line((-FILLET4_R * 0.292893218813, FILLET4_R * 0.292893218813), (0, 0))
            Line((0, 0), (FILLET4_R * 0.414213562373, 0))
        make_face()
    extrude(amount=65.153089982, mode=Mode.SUBTRACT)
    with BuildSketch(Plane(origin=(22, 22.5, -58.106601718), x_dir=(0.7071067811865732, -0.7071067811865217, 1.413083212815449e-15), z_dir=(0, 0, 1)), Plane(origin=(25, 19.5, -58.106601718), x_dir=(0, -1, 0), z_dir=(0, 0, 1))) as fillet4_2_piece_9:
        with BuildLine():
            CenterArc((FILLET4_R * 0.414213562373, -FILLET4_R), FILLET4_R, 90, 45)
            Line((-FILLET4_R * 0.292893218813, -FILLET4_R * 0.292893218813), (0, 0))
            Line((0, 0), (FILLET4_R * 0.414213562373, 0))
        make_face()
    extrude(amount=65.153089982, mode=Mode.SUBTRACT)
    with BuildSketch(Plane(origin=(8, 21.621320344, 22.878679656), x_dir=(0.8164965809277264, -0.4082482904638617, -0.4082482904638637), z_dir=(1.6345182834260303e-15, -0.7071067811865476, 0.7071067811865476))) as fillet4_2_piece_10:
        with BuildLine():
            CenterArc((FILLET4_R * 0.317837245196, -FILLET4_R), FILLET4_R, 90, 35.264389683)
            Line((-FILLET4_R * 0.259513023994, -FILLET4_R * 0.183503419072), (0, 0))
            Line((0, 0), (FILLET4_R * 0.317837245196, 0))
        make_face()
    extrude(amount=1.757359313, mode=Mode.SUBTRACT)
    with BuildSketch(Plane(origin=(22.878679656, 21.621320344, 8), x_dir=(-0.4082482904638595, -0.40824829046385785, 0.8164965809277304), z_dir=(0.7071067811865476, -0.7071067811865476, 1.4422220147876744e-15))) as fillet4_2_piece_11:
        with BuildLine():
            CenterArc((FILLET4_R * 0.317837245196, FILLET4_R), FILLET4_R, 234.735610317, 35.264389683)
            Line((-FILLET4_R * 0.259513023994, FILLET4_R * 0.183503419072), (0, 0))
            Line((0, 0), (FILLET4_R * 0.317837245196, 0))
        make_face()
    extrude(amount=1.757359313, mode=Mode.SUBTRACT)
    with BuildSketch(Plane(origin=(25, 10.644564476, 16.855435524), x_dir=(-0.8164965809277264, 0.4082482904638615, 0.4082482904638637), z_dir=(-1.6747652892626796e-15, 0.7071067811865476, -0.7071067811865474)), Plane(origin=(16.855435524, 10.644564476, 25), x_dir=(-0.7071067811865467, -0.7071067811865483, 4.57554386101845e-15), z_dir=(-0.7071067811865483, 0.7071067811865467, 0))) as fillet4_2_piece_12:
        with BuildLine():
            CenterArc((FILLET4_R * 0.517638090205, -FILLET4_R), FILLET4_R, 90, 54.735610317)
            Line((-FILLET4_R * 0.298858490723, -FILLET4_R * 0.42264973081), (0, 0))
            Line((0, 0), (FILLET4_R * 0.517638090205, 0))
        make_face()
    extrude(amount=12.319031977, mode=Mode.SUBTRACT)
    with BuildSketch(Plane(origin=(25, -23.106601718, 17), x_dir=(-0.7071067811865418, 0, 0.7071067811865532), z_dir=(0, 1, 0)), Plane(origin=(17, -23.106601718, 25), x_dir=(-1, 0, 0), z_dir=(0, 1, 0))) as fillet4_2_piece_13:
        with BuildLine():
            CenterArc((FILLET4_R * 0.414213562373, -FILLET4_R), FILLET4_R, 90, 45)
            Line((-FILLET4_R * 0.292893218813, -FILLET4_R * 0.292893218813), (0, 0))
            Line((0, 0), (FILLET4_R * 0.414213562373, 0))
        make_face()
    extrude(amount=32.653089982, mode=Mode.SUBTRACT)
    with BuildSketch(Plane(origin=(17.878679656, 10.5, 24.121320344), x_dir=(-0.4082482904638648, 0.8164965809277243, -0.408248290463865), z_dir=(0.7071067811865476, 0, -0.7071067811865476))) as fillet4_2_piece_14:
        with BuildLine():
            CenterArc((FILLET4_R * 0.317837245196, -FILLET4_R), FILLET4_R, 90, 35.264389683)
            Line((-FILLET4_R * 0.259513023994, -FILLET4_R * 0.183503419072), (0, 0))
            Line((0, 0), (FILLET4_R * 0.317837245196, 0))
        make_face()
    extrude(amount=8.828427125, mode=Mode.SUBTRACT)

    # Chamfer5
    chamfer5_edges = [part.edges().sort_by_distance(p)[0] for p in [
        (-55, -20, 22.5),
        (22.5, -20, -55),
    ]]
    chamfer(chamfer5_edges, length=CHAMFER5_SIZE)

    # Sketch10 → Cut-Extrude3 (cut)
    with BuildSketch(Plane.XY.offset(25)):
        Polygon((1, -20), (9, -12), (25, -12), (25, -20), align=None)
    cut_extrude3 = extrude(amount=-CUT_EXTRUDE3_DEPTH, mode=Mode.SUBTRACT)

    # Mirror5: Cut-Extrude3 across plane
    add(cut_extrude3.mirror(Plane(origin=(0, 0, 0), x_dir=(0.7071067811865467, 0, 0.7071067811865482), z_dir=(-0.7071067811865482, 0, 0.7071067811865468))), mode=Mode.SUBTRACT)

    # Fillet5
    fillet5_edges = [part.edges().sort_by_distance(p)[0] for p in [
        (-47, -20, 22.5),
        (22.5, -20, -47),
        (22.5, -12, -55),
        (-55, -12, 22.5),
        (1, -20, 22.5),
        (9, -12, 22.5),
        (22.5, -20, 1),
        (22.5, -12, 9),
    ]]
    fillet(fillet5_edges, radius=FILLET5_R)

    # Sketch11 → Cut-Extrude4 (cut)
    with BuildSketch(Plane(origin=(25, 0, 0), x_dir=(0, 0, -1), z_dir=(1, 0, 0))):
        with Locations(Location((7, -10, 0), (0, 0, 180))):
            Circle(SKETCH11_R)
        with Locations(Location((39, -10, 0), (0, 0, 180))):
            Circle(SKETCH11_R)
    extrude(amount=-CUT_EXTRUDE4_DEPTH, mode=Mode.SUBTRACT)


solid = part.part
